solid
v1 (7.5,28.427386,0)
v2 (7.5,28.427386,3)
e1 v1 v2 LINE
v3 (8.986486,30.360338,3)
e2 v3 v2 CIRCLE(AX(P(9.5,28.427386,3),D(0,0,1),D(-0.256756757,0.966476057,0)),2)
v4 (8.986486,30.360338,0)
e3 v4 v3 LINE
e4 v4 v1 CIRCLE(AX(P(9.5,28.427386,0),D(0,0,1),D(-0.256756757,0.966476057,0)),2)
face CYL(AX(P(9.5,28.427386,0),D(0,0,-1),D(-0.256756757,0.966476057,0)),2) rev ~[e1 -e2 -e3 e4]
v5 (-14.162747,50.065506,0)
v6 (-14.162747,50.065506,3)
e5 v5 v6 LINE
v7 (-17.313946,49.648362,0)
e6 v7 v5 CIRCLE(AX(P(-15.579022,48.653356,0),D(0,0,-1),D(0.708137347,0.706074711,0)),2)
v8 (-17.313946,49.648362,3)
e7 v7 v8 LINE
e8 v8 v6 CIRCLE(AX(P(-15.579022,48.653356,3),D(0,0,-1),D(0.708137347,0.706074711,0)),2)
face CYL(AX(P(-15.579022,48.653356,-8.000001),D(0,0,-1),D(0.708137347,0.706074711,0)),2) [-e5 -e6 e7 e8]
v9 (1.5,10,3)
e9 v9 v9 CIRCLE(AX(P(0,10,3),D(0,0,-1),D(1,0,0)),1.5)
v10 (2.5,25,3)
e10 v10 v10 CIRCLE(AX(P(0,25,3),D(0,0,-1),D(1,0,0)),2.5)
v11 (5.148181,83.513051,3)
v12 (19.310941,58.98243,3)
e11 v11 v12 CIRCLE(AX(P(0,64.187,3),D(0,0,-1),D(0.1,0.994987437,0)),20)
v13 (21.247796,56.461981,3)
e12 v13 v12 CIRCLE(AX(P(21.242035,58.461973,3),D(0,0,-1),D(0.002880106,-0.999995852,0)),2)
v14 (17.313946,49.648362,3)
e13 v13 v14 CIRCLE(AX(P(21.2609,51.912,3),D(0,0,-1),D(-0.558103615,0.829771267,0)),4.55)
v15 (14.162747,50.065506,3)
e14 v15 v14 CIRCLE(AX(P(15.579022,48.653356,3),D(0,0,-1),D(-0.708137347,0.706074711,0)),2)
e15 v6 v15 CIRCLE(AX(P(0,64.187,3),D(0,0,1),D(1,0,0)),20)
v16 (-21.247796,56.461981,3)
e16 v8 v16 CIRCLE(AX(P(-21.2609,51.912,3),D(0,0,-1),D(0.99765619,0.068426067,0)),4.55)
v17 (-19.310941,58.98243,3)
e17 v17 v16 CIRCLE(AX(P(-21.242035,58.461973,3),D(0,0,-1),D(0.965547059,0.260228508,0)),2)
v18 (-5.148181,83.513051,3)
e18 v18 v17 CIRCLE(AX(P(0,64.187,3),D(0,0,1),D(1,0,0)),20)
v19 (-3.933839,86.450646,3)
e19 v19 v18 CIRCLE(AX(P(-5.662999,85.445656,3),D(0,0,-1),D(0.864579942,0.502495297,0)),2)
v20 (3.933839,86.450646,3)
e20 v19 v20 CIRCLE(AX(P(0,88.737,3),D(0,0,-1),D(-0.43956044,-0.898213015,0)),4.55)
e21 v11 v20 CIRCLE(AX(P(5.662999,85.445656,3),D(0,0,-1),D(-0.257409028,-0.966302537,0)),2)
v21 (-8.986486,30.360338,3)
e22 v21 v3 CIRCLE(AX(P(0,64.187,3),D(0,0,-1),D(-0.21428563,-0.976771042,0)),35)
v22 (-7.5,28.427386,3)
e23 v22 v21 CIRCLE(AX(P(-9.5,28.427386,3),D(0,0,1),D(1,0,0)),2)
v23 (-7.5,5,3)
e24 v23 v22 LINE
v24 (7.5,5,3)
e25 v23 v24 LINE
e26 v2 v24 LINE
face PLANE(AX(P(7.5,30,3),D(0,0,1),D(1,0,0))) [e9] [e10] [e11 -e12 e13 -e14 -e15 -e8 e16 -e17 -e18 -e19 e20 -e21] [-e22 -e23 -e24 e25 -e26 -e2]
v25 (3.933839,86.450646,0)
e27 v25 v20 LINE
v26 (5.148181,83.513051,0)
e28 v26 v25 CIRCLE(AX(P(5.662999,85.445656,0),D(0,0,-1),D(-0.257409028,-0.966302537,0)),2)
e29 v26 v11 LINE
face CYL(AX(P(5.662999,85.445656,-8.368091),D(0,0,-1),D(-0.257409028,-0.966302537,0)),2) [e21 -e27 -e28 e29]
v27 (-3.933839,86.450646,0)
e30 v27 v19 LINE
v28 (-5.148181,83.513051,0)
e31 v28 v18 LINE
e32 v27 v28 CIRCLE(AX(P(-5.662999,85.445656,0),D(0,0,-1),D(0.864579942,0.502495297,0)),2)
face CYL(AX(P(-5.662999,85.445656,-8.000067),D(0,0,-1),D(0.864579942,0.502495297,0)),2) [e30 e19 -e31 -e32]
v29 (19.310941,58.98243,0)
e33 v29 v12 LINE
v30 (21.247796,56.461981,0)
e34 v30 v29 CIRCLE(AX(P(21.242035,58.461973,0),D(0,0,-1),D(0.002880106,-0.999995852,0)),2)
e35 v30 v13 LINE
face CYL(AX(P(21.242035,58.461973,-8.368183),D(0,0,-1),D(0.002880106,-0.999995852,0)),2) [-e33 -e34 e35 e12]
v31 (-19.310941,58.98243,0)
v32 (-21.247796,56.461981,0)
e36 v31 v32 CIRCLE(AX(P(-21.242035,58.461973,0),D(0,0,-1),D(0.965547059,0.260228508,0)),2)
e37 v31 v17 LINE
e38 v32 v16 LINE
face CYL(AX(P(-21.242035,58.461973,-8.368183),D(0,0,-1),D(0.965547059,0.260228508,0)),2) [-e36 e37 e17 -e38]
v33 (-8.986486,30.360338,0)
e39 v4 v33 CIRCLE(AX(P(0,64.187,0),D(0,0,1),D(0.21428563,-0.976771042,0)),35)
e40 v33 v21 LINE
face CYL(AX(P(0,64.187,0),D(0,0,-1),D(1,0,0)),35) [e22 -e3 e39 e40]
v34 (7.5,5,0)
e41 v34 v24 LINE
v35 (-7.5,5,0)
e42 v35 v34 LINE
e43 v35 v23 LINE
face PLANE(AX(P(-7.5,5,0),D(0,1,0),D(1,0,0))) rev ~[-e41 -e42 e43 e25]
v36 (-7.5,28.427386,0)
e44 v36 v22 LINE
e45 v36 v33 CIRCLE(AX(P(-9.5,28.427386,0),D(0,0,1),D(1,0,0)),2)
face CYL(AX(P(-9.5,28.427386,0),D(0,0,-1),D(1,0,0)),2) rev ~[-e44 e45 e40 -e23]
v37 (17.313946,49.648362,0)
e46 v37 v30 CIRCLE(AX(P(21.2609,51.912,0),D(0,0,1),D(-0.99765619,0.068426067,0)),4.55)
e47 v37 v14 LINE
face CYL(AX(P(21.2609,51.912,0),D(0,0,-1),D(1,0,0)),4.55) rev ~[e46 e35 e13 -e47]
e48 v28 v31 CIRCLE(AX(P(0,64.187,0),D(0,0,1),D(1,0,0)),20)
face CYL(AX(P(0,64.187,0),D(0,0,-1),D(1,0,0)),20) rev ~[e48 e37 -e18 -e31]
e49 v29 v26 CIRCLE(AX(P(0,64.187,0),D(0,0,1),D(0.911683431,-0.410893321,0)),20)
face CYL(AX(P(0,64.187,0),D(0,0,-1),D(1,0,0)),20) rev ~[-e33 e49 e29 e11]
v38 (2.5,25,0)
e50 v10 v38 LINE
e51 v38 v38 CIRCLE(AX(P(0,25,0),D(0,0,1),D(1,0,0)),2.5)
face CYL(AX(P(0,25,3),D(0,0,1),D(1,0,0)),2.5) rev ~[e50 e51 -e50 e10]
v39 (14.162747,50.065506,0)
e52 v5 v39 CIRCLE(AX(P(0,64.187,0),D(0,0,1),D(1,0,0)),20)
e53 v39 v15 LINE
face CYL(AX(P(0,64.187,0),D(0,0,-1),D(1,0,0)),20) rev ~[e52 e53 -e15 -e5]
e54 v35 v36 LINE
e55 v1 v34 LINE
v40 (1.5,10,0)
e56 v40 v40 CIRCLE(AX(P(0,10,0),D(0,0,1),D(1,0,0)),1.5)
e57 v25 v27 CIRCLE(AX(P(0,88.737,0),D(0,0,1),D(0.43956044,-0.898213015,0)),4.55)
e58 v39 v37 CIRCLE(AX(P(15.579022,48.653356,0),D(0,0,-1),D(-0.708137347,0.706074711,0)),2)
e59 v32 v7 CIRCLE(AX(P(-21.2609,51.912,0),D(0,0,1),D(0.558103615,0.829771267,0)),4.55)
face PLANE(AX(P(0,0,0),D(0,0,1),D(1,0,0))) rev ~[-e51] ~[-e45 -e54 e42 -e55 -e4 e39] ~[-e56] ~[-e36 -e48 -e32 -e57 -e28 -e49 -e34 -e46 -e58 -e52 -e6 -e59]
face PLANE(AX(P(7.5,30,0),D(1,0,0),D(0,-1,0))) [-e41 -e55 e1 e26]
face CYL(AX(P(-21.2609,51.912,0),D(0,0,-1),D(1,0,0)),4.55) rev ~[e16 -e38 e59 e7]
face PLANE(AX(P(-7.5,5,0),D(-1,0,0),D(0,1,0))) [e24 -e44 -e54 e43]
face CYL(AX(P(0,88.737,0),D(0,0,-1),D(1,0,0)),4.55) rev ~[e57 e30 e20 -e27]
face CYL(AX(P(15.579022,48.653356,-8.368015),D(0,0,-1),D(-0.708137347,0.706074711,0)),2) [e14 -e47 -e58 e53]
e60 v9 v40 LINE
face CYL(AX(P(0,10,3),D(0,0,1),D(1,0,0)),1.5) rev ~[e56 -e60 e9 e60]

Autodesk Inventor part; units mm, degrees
ref_plane "YZ Plane" through (0, 0, 0) normal (1, 0, 0) x (0, 1, 0)
ref_plane "XZ Plane" through (0, 0, 0) normal (0, 1, 0) x (-1, 0, 0)
ref_plane "XY Plane" through (0, 0, 0) normal (0, 0, 1) x (1, 0, 0)
sketch "Эскиз1" plane through (0, 0, 0) normal (0, 0, 1) x (1, 0, 0)
  line L0 (17.5, 5) -> (-17.5, 5) construction
  line L1 (-17.5, 5) -> (-17.5, -5) construction
  line L2 (-17.5, -5) -> (17.5, -5) construction
  line L3 (17.5, -5) -> (17.5, 5) construction
  line L4 (17.5, 5) -> (-17.5, -5) construction
  line L5 (-17.5, 5) -> (17.5, -5) construction
  line L6 (12.8471, 5) -> (-11.1661, 5) construction
  circle A0 centre (0, 64.187) radius 35
  circle A1 centre (0, 64.187) radius 20
  line L7 (0, 64.187) -> (0, 0) construction
  circle A2 centre (0, 88.737) radius 4.55
  line L8 (-7.5, 5) -> (-7.5, 30)
  line L9 (7.5, 30) -> (7.5, 5)
  line L10 (-2, 49.2906) -> (2, 49.2906) construction
  line L11 (-7.5, 5) -> (7.5, 5)
  line L12 (-2, 85.687) -> (2, 85.687)
  line L13 (2, 85.687) -> (2, 82.687)
  line L14 (2, 82.687) -> (-2, 82.687)
  line L15 (-2, 82.687) -> (-2, 85.687)
  line L16 (-2, 85.687) -> (2, 82.687) construction
  line L17 (2, 85.687) -> (-2, 82.687) construction
  line L18 (-17.6195, 51.7049) -> (-19.6195, 55.169)
  circle A3 centre (-21.2609, 51.912) radius 4.55
  line L19 (-17.0215, 56.669) -> (-15.0215, 53.2049)
  line L20 (-19.6195, 55.169) -> (-17.0215, 56.669)
  line L21 (-15.0215, 53.2049) -> (-17.6195, 51.7049)
  line L22 (19.6195, 55.169) -> (17.6195, 51.7049)
  circle A4 centre (21.2609, 51.912) radius 4.55
  line L23 (15.0215, 53.2049) -> (17.0215, 56.669)
  line L24 (17.6195, 51.7049) -> (15.0215, 53.2049)
  line L25 (17.0215, 56.669) -> (19.6195, 55.169)
  point P0 (0, 89.2906)
  point P1 (0, 84.187)
  point P2 (-17.3205, 54.187)
  point P3 (17.3205, 54.187)
  point P4 (18.2337, 55.9692)
  point P5 (18.7216, 55.6875)
  point P6 (16.7216, 52.2234)
  point P7 (16.2337, 52.5051)
  point P8 (-16.2337, 52.5051)
  point P9 (-16.7216, 52.2234)
  point P10 (-18.7216, 55.6875)
  point P11 (-18.2337, 55.9692)
  point P12 (-2, 84.0867)
  point P13 (-2, 84.6501)
  point P14 (2, 84.6501)
  point P15 (2, 84.0867)
  dimension "d3" = 40
  dimension "d4" = 9.1
  dimension "d0" = 70
  dimension "d9" = 35
  dimension "d10" = 25
  dimension "d11" = 10
  dimension "d12" = 15
  dimension "d14" = 7.5
  dimension "d30" = 4
  dimension "d31" = 3
  dimension "d34" = 360
extrude "Выдавливание1" add sketch "Эскиз1" along normal blind 3
fillet "Сопряжение1" radius 2 14 edges at (-7.5, 30, 1.5) (7.5, 30, 1.5) (-18.2337, 55.9692, 1.5) (-18.7216, 55.6875, 1.5) (-16.2337, 52.5051, 1.5) (-16.7216, 52.2234, 1.5) (-2, 84.0867, 1.5) (-2, 84.6501, 1.5) (2, 84.0867, 1.5) (2, 84.6501, 1.5) (18.7216, 55.6875, 1.5) (18.2337, 55.9692, 1.5) (16.7216, 52.2234, 1.5) (16.2337, 52.5051, 1.5)
sketch "Эскиз2" plane through (0, 0, 3) normal (0, 0, 1) x (1, 0, 0)
  circle A0 centre (0, 25) radius 2.5
  circle A1 centre (0, 10) radius 1.5
  line L0 (0, 0) -> (0, 43.9437)
  line L1 (0, 10) -> (0, 5)
  line L2 (-7.5, 5) -> (7.5, 5) projected
  dimension "d24" = 15
  dimension "d25" = 5
  dimension "d26" = 3
  dimension "d27" = 5
extrude "Выдавливание2" cut sketch "Эскиз2" against normal blind 4
properties part number "Деталь3_мозговорот"
